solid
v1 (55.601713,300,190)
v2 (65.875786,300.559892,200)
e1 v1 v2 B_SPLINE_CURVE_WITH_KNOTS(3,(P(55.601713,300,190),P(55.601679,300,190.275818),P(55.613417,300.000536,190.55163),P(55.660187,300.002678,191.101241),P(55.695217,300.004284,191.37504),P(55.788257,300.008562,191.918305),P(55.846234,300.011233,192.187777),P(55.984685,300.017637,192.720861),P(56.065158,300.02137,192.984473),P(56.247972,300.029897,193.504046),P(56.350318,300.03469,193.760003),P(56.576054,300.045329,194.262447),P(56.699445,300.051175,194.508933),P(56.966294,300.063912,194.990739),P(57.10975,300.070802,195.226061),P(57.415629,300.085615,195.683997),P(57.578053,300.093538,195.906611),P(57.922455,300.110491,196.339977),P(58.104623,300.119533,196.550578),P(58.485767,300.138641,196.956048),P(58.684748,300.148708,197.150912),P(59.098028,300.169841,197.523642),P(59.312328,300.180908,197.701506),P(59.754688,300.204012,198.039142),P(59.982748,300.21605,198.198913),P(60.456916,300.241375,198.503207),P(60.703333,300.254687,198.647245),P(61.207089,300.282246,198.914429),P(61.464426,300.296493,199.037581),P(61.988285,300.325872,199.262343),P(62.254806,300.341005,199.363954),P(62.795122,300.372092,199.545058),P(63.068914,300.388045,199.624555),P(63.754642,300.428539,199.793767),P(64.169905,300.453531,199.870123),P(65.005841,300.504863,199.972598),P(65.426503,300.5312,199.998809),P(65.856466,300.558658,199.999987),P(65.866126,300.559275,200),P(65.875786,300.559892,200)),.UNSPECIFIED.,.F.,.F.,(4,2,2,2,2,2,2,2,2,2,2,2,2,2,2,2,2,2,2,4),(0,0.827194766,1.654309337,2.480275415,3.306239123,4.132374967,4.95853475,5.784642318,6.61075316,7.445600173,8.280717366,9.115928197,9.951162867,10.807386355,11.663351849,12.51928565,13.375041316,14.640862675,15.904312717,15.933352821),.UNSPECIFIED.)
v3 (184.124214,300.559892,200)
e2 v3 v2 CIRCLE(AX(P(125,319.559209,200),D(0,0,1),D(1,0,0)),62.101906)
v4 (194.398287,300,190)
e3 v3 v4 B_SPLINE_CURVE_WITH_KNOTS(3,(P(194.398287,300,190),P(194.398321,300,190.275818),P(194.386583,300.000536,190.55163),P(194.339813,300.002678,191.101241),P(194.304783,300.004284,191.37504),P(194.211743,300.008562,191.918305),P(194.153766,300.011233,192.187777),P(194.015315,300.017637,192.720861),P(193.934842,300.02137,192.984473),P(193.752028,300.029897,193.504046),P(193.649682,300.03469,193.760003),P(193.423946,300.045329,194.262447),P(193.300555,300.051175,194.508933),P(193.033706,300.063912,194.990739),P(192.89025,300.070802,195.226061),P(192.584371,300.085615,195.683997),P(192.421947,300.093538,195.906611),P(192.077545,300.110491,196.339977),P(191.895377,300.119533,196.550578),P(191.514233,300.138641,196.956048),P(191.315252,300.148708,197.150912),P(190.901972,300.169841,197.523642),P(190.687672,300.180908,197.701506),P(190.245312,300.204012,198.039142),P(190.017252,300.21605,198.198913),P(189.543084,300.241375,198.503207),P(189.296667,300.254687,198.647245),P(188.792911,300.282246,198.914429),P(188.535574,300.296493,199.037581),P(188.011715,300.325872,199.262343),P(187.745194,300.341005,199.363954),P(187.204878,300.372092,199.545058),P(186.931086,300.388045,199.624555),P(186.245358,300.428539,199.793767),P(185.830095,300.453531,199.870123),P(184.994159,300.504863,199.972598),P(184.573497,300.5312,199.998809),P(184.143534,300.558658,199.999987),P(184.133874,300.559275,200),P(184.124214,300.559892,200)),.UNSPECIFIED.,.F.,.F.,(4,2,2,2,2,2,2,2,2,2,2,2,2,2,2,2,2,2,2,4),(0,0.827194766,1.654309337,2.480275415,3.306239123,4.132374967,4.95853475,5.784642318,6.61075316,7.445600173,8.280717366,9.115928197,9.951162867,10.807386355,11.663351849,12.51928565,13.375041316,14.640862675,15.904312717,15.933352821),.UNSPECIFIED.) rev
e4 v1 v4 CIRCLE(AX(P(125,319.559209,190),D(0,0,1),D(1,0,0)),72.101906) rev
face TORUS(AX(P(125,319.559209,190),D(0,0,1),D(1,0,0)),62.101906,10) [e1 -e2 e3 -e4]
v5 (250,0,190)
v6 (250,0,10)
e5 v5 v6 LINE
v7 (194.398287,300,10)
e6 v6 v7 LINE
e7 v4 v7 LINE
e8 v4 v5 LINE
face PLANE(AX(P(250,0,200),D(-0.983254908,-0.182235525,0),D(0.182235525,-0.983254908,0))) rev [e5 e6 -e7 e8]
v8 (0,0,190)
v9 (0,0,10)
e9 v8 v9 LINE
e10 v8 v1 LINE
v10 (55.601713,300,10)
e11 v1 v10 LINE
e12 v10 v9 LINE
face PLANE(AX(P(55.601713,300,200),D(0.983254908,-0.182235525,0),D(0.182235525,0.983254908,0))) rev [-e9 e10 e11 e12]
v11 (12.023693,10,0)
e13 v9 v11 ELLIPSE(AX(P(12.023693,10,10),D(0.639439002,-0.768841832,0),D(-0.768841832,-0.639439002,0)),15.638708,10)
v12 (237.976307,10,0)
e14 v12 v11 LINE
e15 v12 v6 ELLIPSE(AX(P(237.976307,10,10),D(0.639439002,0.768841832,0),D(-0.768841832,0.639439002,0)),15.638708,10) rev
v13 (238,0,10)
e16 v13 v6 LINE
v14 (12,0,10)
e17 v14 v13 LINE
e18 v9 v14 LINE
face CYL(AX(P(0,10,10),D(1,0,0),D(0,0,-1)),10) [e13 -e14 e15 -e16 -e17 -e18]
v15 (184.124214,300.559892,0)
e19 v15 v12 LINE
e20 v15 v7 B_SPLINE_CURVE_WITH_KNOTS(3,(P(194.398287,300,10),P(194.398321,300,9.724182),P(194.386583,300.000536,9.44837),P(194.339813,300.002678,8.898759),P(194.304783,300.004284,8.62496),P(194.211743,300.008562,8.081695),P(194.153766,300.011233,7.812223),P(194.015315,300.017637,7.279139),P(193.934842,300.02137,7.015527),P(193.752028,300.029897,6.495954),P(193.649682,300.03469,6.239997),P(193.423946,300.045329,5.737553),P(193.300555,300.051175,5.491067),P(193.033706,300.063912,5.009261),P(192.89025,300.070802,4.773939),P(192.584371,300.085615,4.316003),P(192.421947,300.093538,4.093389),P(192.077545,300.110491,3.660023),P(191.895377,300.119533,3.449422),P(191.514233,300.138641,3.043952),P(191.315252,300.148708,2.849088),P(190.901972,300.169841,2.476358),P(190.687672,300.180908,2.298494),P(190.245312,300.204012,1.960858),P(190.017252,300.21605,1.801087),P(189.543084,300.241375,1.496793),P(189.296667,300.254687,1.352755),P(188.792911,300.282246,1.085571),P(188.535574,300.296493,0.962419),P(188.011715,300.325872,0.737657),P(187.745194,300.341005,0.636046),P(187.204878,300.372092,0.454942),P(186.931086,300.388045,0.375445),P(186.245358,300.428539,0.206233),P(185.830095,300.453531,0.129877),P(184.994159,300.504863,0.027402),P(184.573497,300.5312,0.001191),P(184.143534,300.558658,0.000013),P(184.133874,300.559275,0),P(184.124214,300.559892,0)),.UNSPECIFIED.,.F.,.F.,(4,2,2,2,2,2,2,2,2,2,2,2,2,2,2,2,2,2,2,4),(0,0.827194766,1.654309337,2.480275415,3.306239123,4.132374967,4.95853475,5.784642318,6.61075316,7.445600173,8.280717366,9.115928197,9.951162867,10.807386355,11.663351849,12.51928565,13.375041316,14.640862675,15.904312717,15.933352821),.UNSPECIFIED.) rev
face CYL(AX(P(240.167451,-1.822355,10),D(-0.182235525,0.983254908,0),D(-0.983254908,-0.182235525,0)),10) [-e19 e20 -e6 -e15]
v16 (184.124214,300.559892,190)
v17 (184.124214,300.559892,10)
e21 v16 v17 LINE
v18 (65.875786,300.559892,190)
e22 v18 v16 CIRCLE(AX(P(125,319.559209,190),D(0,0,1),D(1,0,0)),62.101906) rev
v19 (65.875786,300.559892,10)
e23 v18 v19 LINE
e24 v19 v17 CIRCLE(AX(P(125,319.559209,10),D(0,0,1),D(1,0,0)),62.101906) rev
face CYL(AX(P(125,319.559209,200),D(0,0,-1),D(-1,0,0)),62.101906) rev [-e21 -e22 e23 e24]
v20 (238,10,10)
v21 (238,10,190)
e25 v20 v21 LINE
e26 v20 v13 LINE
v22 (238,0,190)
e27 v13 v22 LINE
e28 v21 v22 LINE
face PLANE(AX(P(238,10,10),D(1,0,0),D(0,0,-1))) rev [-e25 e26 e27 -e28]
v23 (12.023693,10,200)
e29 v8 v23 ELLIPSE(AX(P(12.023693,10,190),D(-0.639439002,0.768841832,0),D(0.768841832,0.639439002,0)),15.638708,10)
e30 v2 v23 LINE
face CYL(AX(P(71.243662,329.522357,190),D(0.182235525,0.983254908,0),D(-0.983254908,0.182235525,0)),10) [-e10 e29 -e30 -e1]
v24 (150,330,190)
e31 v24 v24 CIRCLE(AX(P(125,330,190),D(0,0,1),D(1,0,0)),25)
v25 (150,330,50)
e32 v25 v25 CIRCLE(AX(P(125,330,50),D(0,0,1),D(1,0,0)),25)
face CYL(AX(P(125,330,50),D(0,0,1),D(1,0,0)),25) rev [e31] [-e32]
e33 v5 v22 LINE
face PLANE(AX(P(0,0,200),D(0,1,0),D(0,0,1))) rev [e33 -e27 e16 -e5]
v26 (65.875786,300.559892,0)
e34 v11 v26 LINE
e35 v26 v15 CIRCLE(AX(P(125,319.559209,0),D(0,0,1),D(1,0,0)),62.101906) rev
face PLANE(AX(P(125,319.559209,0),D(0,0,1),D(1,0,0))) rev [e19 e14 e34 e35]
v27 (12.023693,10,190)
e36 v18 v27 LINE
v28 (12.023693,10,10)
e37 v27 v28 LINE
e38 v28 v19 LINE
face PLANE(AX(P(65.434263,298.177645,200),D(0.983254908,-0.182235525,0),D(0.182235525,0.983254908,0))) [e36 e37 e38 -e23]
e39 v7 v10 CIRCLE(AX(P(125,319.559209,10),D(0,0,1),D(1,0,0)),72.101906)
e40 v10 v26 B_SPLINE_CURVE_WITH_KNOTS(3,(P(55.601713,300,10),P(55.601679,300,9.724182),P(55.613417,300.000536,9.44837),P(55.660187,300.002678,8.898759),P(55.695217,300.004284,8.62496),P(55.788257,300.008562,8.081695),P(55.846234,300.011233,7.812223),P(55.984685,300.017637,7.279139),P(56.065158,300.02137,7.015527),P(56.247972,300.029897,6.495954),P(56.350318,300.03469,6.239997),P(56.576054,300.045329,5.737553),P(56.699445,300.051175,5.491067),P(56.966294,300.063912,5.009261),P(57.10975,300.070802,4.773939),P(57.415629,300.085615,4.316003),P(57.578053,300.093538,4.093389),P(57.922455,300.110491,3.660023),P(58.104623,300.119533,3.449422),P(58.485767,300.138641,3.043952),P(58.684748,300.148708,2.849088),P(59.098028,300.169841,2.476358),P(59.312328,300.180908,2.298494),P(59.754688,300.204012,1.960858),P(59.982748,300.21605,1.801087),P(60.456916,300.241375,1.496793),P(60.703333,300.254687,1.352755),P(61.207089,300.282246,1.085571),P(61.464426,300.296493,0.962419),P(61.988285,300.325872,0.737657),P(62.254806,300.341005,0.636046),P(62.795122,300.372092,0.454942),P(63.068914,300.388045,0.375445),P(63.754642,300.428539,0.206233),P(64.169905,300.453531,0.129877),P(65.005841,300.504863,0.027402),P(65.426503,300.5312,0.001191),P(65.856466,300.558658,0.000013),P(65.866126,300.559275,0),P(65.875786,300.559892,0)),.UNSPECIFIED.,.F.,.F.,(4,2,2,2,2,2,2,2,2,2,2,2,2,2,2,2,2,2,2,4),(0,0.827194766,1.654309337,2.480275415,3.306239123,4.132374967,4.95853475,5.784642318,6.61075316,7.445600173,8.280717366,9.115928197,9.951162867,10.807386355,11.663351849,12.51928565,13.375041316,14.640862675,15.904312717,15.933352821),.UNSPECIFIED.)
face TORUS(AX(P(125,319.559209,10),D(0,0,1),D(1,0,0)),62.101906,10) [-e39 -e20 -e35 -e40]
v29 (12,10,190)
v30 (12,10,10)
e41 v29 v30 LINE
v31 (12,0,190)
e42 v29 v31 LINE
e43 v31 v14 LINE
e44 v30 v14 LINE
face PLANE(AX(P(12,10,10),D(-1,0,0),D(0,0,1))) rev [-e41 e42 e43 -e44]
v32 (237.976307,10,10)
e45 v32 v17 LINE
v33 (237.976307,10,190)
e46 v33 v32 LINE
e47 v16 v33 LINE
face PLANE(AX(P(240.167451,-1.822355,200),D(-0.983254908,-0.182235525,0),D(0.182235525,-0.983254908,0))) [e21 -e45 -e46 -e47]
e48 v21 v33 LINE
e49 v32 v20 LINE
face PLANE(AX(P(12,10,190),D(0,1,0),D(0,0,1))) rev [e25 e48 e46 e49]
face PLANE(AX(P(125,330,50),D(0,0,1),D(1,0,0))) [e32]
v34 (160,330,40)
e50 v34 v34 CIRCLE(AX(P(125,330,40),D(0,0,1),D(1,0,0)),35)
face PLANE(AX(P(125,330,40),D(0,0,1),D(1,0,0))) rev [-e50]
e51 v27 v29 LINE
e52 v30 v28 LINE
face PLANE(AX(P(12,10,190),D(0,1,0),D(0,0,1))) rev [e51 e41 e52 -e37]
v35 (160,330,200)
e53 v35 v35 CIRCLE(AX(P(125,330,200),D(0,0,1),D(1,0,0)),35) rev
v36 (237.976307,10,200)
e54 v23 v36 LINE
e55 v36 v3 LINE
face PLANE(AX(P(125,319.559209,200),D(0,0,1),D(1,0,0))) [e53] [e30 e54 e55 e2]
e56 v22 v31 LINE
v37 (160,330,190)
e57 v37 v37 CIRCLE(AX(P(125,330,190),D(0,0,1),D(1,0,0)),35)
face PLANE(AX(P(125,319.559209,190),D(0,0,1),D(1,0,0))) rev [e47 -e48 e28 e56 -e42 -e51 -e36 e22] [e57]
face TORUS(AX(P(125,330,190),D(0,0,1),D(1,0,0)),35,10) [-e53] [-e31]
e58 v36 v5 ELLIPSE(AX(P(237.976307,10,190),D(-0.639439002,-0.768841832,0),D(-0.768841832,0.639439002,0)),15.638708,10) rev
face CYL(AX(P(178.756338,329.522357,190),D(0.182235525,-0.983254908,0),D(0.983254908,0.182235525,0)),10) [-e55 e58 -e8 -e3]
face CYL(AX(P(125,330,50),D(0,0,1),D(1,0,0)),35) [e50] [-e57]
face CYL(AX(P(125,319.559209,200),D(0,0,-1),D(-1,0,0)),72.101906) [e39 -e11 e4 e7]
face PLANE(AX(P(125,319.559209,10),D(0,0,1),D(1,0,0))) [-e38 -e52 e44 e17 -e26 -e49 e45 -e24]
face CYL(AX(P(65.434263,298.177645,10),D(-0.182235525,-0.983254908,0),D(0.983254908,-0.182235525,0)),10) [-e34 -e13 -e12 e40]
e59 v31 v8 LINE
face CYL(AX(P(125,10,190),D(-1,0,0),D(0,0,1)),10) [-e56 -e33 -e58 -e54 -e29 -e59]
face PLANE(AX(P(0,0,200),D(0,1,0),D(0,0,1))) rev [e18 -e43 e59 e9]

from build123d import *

# Parameters (mm, degrees)
BOSS_EXTRUDE1_DEPTH = 200
SKETCH3_R           = 25
CUT_EXTRUDE2_DEPTH  = 150
FILLET1_R           = 10
FILLET2_R           = 10
SHELL1_START        = 10
SHELL1_OUTLINE_R    = 35
SHELL1_DEPTH        = 180
SHELL1_2_OUTLINE_R  = 35
SHELL1_2_DEPTH      = 30
SKETCH4_W           = 226
SKETCH4_H           = 180
CUT_EXTRUDE4_DEPTH  = 10


# Read off the part's stored shape, not the designer's step: Shell1
with BuildPart() as part:
    # Sketch1 → Boss-Extrude1 (new body)
    with BuildSketch(Plane.XY):
        with BuildLine():
            Line((0, 0), (250, 0))
            Line((250, 0), (194.398287, 300))
            ThreePointArc((194.398287, 300), (125, 391.661115), (55.601713, 300))
            Line((55.601713, 300), (0, 0))
        make_face()
    extrude(amount=BOSS_EXTRUDE1_DEPTH)

    # Sketch3 → Cut-Extrude2 (cut)
    with BuildSketch(Plane.XY.offset(200)):
        with Locations((125, 330)):
            Circle(SKETCH3_R)
    extrude(amount=-CUT_EXTRUDE2_DEPTH, mode=Mode.SUBTRACT)

    # Fillet1
    fillet1_edges = [part.edges().sort_by_distance(p)[0] for p in [
        (222.199143, 150, 200),
        (125, 391.661115, 200),
        (100, 330, 200),
        (27.800857, 150, 200),
        (125, 0, 200),
    ]]
    fillet(fillet1_edges, radius=FILLET1_R)

    # Fillet2
    fillet2_edges = [part.edges().sort_by_distance(p)[0] for p in [
        (125, 391.661115, 0),
        (222.199143, 150, 0),
        (125, 0, 0),
        (27.800857, 150, 0),
    ]]
    fillet(fillet2_edges, radius=FILLET2_R)

    # Shell1 outline → Shell1 (cut)
    with BuildSketch(Plane.XY.offset(SHELL1_START)):
        with BuildLine():
            Line((65.875786, 300.559892), (12.023693, 10))
            Line((12.023693, 10), (237.976307, 10))
            Line((237.976307, 10), (184.124214, 300.559892))
            ThreePointArc((184.124214, 300.559892), (125, 381.661115), (65.875786, 300.559892))
        make_face()
        with Locations((125, 330)):
            Circle(SHELL1_OUTLINE_R, mode=Mode.SUBTRACT)
    extrude(amount=SHELL1_DEPTH, mode=Mode.SUBTRACT)

    # Shell1 2 outline → Shell1 2 (cut)
    with BuildSketch(Plane.XY.offset(SHELL1_START)):
        with Locations((125, 330)):
            Circle(SHELL1_2_OUTLINE_R)
    extrude(amount=SHELL1_2_DEPTH, mode=Mode.SUBTRACT)

    # Sketch4 → Cut-Extrude4 (cut)
    with BuildSketch(Plane.XZ):
        with Locations((125, 100)):
            Rectangle(SKETCH4_W, SKETCH4_H)
    extrude(amount=-CUT_EXTRUDE4_DEPTH, mode=Mode.SUBTRACT)


solid = part.part
